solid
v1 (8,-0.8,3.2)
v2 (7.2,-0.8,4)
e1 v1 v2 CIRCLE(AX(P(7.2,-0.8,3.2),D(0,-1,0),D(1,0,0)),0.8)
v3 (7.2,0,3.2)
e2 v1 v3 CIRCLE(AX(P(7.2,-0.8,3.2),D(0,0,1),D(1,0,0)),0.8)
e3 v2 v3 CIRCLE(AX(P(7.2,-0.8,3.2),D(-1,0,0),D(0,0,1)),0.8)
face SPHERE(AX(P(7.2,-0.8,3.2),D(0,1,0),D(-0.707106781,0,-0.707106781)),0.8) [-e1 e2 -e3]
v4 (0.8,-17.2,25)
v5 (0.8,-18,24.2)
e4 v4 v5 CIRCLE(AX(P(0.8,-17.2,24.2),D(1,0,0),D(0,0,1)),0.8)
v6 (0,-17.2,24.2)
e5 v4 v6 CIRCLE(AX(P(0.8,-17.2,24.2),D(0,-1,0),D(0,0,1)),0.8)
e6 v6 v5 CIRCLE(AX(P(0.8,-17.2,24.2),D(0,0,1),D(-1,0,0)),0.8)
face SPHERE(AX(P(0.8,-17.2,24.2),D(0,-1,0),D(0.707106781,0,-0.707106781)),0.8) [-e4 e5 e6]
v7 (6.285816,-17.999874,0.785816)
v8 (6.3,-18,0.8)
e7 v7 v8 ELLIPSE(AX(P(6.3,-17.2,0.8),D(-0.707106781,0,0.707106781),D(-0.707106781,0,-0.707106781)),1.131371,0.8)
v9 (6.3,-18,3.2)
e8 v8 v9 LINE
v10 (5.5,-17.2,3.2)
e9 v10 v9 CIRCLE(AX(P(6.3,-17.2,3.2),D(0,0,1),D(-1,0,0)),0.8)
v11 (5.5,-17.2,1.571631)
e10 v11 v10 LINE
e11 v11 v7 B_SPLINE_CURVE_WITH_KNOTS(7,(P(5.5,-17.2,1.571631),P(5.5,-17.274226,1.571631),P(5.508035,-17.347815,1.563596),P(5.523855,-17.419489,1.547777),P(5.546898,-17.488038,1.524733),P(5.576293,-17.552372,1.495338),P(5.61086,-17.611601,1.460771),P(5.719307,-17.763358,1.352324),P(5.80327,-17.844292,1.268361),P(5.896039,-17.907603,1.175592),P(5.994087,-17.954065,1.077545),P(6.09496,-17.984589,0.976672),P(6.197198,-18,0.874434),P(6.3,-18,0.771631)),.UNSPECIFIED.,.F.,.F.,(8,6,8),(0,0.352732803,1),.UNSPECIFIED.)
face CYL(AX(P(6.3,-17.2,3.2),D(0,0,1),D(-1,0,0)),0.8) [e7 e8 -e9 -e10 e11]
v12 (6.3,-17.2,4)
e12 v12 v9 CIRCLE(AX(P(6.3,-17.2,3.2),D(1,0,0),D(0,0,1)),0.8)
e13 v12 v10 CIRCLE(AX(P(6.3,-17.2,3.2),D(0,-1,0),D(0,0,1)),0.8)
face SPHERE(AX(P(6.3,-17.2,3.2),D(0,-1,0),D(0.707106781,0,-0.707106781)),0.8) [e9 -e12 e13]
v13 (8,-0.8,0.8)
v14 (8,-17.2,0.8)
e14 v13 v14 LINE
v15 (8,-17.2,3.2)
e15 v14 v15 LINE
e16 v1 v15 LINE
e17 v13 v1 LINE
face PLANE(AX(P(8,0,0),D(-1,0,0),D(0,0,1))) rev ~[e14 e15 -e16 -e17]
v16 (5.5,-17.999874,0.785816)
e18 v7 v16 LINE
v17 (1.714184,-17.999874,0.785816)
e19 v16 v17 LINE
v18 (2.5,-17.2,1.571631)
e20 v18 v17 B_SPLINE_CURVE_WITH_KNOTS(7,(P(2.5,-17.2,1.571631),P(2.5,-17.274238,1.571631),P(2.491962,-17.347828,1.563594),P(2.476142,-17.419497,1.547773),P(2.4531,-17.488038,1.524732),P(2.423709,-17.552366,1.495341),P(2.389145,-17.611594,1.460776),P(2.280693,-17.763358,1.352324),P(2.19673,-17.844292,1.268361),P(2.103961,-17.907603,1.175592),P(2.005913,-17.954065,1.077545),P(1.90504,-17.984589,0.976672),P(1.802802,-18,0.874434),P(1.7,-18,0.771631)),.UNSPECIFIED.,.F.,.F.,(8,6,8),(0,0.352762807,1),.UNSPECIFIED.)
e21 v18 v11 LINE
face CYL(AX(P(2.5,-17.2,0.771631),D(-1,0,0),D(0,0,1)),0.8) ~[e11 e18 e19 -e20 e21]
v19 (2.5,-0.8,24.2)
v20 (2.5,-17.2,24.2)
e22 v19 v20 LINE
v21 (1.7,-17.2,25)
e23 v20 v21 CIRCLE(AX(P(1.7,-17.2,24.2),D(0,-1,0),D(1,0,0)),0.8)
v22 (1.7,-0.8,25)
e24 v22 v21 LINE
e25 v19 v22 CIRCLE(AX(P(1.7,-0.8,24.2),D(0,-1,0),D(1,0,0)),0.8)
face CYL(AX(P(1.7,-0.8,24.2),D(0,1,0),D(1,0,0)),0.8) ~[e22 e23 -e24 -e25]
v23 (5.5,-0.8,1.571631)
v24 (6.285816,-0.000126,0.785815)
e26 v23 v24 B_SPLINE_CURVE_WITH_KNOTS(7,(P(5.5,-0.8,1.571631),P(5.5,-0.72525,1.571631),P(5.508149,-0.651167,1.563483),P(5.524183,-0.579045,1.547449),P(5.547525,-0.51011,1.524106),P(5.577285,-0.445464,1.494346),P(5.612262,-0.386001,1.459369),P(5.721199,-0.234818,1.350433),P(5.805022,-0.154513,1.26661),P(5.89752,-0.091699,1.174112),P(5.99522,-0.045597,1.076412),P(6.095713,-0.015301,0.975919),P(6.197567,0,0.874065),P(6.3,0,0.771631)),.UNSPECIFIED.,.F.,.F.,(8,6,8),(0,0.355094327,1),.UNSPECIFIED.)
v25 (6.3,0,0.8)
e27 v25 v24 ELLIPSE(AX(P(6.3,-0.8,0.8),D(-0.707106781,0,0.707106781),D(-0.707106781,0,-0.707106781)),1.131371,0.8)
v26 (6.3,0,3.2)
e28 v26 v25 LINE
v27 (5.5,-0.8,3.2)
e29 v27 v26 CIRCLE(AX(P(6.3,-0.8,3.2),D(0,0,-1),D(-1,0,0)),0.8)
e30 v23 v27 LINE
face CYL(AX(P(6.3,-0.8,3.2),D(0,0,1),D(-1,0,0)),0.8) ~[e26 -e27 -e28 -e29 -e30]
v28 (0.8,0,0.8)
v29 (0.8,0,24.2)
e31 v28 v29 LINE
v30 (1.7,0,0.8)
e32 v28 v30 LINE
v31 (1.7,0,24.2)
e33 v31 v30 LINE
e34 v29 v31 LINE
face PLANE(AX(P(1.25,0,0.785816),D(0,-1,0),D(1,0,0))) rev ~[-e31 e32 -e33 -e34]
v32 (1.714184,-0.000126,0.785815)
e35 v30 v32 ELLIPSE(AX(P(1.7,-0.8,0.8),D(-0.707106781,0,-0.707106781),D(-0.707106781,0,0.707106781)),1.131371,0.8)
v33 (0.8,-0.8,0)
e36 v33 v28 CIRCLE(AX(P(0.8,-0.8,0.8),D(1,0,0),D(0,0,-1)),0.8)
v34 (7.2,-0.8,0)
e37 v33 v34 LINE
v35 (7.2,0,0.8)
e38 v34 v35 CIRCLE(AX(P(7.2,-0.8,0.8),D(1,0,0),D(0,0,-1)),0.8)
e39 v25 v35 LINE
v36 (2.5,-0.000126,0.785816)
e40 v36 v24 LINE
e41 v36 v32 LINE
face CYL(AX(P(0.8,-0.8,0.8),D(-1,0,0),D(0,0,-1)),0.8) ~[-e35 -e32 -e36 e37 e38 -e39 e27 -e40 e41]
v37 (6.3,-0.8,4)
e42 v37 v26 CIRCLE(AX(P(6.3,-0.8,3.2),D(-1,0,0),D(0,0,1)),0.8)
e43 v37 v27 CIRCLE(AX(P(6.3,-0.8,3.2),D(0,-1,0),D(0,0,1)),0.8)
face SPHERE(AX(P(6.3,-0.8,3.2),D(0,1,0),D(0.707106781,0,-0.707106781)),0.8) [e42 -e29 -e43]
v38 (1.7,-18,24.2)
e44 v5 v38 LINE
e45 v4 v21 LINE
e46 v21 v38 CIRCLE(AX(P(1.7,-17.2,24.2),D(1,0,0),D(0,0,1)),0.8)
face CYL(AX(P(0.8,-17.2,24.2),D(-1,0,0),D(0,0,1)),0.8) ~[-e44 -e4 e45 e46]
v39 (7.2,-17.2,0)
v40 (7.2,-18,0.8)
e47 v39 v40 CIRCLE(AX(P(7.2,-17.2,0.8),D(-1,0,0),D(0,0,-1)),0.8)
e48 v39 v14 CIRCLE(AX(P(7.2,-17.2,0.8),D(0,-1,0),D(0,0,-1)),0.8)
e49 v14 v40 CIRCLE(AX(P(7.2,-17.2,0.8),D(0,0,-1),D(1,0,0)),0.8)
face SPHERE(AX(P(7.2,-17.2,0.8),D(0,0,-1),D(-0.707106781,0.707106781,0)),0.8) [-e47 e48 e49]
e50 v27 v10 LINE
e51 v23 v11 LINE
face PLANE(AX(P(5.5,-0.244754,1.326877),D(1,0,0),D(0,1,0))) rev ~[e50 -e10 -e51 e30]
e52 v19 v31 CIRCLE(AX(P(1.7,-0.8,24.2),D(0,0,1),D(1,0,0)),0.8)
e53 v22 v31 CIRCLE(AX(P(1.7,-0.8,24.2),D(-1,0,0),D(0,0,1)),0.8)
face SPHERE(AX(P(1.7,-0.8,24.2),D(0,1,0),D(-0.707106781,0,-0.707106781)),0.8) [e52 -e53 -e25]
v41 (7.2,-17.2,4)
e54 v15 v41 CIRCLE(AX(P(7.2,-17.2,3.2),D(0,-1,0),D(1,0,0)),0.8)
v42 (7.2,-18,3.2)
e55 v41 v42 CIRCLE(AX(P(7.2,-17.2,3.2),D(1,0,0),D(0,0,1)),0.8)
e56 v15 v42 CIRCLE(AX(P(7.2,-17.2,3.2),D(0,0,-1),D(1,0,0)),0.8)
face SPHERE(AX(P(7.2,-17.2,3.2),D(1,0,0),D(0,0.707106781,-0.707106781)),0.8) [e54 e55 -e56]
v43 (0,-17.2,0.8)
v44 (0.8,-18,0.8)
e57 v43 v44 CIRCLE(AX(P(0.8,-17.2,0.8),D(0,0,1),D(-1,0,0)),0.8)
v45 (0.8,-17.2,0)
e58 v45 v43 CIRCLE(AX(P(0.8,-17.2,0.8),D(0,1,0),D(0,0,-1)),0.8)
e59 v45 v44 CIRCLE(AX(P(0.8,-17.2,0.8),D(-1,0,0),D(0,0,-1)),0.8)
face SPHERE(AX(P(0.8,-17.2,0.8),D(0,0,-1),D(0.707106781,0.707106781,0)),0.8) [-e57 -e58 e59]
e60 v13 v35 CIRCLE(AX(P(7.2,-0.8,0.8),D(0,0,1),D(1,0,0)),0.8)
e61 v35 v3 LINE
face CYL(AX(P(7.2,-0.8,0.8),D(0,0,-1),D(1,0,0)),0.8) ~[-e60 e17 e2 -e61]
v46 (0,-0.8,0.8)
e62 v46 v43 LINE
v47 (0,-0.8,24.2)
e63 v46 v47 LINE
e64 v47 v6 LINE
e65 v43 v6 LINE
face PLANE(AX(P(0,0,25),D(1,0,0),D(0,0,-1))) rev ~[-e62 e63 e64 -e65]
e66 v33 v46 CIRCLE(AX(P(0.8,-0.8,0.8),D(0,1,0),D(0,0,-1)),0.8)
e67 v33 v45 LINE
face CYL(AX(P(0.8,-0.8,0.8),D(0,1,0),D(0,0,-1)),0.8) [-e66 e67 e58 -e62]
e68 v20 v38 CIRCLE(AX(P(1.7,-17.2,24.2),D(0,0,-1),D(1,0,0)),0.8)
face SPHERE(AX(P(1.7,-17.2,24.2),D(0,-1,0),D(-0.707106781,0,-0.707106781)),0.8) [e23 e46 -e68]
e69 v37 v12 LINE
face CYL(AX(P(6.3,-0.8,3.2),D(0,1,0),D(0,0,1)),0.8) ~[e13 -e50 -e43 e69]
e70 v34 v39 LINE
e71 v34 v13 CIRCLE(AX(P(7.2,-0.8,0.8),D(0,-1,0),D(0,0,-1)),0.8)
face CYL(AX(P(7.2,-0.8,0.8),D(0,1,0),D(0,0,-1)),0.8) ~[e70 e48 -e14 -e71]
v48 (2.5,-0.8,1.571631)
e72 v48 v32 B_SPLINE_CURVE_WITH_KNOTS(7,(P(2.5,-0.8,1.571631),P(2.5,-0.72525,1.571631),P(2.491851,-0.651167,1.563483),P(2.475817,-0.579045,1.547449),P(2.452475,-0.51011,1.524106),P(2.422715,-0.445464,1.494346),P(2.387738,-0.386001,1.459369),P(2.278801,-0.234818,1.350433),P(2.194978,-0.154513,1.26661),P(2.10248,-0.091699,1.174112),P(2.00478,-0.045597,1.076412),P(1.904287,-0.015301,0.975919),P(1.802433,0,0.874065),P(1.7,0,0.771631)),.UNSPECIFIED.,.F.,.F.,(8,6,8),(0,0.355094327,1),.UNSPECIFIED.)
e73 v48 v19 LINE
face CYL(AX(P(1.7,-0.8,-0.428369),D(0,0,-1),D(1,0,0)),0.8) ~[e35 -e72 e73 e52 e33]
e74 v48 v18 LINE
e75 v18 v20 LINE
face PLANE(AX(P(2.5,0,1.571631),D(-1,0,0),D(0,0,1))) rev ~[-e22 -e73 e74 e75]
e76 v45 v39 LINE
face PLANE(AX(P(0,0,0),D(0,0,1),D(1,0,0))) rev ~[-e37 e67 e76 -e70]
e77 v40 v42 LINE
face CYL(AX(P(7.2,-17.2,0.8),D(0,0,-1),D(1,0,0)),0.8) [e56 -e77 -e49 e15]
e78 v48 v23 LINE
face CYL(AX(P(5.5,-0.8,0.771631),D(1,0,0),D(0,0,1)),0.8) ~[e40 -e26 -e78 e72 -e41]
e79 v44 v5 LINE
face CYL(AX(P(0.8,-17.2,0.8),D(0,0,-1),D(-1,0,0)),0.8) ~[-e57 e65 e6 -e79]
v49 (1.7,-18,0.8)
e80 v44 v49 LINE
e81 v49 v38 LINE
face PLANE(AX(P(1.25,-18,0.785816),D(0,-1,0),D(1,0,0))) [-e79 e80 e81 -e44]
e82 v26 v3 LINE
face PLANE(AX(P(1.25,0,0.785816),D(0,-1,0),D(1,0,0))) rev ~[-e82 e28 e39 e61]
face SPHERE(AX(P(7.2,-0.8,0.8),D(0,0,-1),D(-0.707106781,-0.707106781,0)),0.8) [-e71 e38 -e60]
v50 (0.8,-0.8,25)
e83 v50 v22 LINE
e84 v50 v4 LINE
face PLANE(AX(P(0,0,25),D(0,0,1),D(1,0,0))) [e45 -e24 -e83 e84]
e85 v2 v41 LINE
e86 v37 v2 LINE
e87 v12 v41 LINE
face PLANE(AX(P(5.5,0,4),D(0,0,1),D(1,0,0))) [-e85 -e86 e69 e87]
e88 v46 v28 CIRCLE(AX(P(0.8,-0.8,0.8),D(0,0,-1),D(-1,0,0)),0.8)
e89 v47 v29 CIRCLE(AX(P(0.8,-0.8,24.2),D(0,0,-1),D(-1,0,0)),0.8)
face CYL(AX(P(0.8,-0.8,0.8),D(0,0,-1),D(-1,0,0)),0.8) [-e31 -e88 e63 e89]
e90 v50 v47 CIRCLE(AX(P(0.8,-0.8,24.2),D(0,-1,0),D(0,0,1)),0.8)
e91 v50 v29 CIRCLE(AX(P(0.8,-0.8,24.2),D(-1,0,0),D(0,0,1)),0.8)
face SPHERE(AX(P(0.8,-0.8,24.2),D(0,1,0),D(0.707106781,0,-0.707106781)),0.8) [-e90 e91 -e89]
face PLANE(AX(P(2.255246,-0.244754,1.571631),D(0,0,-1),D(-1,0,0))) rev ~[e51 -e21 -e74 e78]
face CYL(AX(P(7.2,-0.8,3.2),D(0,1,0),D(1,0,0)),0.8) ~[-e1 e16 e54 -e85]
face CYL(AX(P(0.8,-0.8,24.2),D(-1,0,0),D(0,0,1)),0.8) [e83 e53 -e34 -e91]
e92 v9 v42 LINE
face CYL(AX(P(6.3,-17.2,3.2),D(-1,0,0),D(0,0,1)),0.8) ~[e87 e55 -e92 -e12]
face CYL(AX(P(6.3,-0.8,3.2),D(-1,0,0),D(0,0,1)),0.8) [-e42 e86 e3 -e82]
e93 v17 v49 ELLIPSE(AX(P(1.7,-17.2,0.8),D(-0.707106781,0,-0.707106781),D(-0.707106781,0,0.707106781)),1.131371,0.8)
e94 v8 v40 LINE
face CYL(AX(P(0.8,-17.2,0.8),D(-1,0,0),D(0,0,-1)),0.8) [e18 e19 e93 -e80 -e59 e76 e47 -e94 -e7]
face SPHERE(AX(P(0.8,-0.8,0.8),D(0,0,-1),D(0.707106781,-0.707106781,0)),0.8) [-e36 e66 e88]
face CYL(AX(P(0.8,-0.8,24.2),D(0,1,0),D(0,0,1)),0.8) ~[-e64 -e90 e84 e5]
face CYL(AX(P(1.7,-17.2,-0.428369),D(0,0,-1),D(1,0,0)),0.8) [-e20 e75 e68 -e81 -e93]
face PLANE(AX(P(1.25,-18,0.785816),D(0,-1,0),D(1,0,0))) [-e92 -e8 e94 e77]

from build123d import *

# Parameters (mm, degrees)
F0_W          = 2.5
F0_H          = 1.5716314532
F0_W_2        = 3
F0_H_2        = 23.4283685468
F0_H_3        = 2.4283685468
F1_DEPTH      = 18
F2_T1_DEPTH   = 16.4
F2_T3_DEPTH   = 22.6283685468
F2_T5_DEPTH   = 3
F2_T7_DEPTH   = 1.6283685468
F2_T9_DEPTH   = 0.9
F2_T11_DEPTH  = 2.4
F2_T13_DEPTH  = 6.4
F2_T15_DEPTH  = 23.4
F2_T17_DEPTH  = 0.9
F2_S21_W      = 0.8
F2_S21_H      = 0.8
F2_T22_DEPTH  = 0.8
F2_S27_W      = 0.8
F2_S27_H      = 0.8
F2_T28_DEPTH  = 0.8
F2_S33_W      = 0.8
F2_S33_H      = 0.8
F2_T34_DEPTH  = 0.8
F2_S39_W      = 0.8
F2_S39_H      = 0.8
F2_T40_DEPTH  = 0.8
F2_S45_W      = 0.8
F2_S45_H      = 0.8
F2_T46_DEPTH  = 0.8
F2_S51_W      = 0.8
F2_S51_H      = 0.8
F2_T52_DEPTH  = 0.8
F2_S57_W      = 0.8
F2_S57_H      = 0.8
F2_T58_DEPTH  = 0.8
F2_S63_W      = 0.8
F2_S63_H      = 0.8
F2_T64_DEPTH  = 0.8
F2_S69_W      = 0.8
F2_S69_H      = 0.8
F2_T70_DEPTH  = 0.8
F2_S75_W      = 0.8
F2_S75_H      = 0.8
F2_T76_DEPTH  = 0.8
F2_S81_W      = 0.8
F2_S81_H      = 0.8
F2_T82_DEPTH  = 0.8
F2_S87_W      = 0.8
F2_S87_H      = 0.8
F2_T88_DEPTH  = 0.8
F2_T95_DEPTH  = 5
F2_T99_DEPTH  = 24.6283685468
F2_T106_DEPTH = 3.6283685468
F2_T110_DEPTH = 5
F2_T117_DEPTH = 3.6283685468
F2_T121_DEPTH = 5
F2_T128_DEPTH = 5
F2_T132_DEPTH = 24.6283685468


# Not quite as in the source:
# - a fillet or chamfer that OpenCascade refuses, or shapes differently, is made with other operations: its cross-section is extruded or revolved along the edge and cut away or added


with BuildPart() as f1:
    # F0 (on Front) → F1 (new body)
    with BuildSketch(Plane.XZ):
        with Locations((1.25, 0.7858157266)):
            Rectangle(F0_W, F0_H)
        with Locations((4, 0.7858157266)):
            Rectangle(F0_W_2, F0_H)
        with Locations((1.25, 13.2858157266)):
            Rectangle(F0_W, F0_H_2)
        with Locations((6.75, 0.7858157266)):
            Rectangle(F0_W, F0_H)
        with Locations((6.75, 2.7858157266)):
            Rectangle(F0_W, F0_H_3)
    extrude(amount=F1_DEPTH)

    # F2: fillet of radius 0.8 on 22 edges, made by hand

    # F2_s2 → F2_t1 (cut)
    with BuildSketch(Plane.XZ.offset(0.8)):
        with BuildLine():
            ThreePointArc((8, 3.2), (7.7656854249, 3.7656854249), (7.2, 4))
            Line((7.2, 4), (8, 4))
            Line((8, 4), (8, 3.2))
        make_face()
        with BuildLine():
            ThreePointArc((7.2, 0), (7.7656854249, 0.2343145751), (8, 0.8))
            Line((8, 0.8), (8, 0))
            Line((8, 0), (7.2, 0))
        make_face()
        with BuildLine():
            ThreePointArc((6.3, 4), (5.7343145751, 3.7656854249), (5.5, 3.2))
            Line((5.5, 3.2), (5.5, 4))
            Line((5.5, 4), (6.3, 4))
        make_face()
        with BuildLine():
            ThreePointArc((2.5, 24.2), (2.2656854249, 24.7656854249), (1.7, 25))
            Line((1.7, 25), (2.5, 25))
            Line((2.5, 25), (2.5, 24.2))
        make_face()
        with BuildLine():
            ThreePointArc((0.8, 25), (0.2343145751, 24.7656854249), (0, 24.2))
            Line((0, 24.2), (0, 25))
            Line((0, 25), (0.8, 25))
        make_face()
        with BuildLine():
            ThreePointArc((0.8, 0), (0.2343145751, 0.2343145751), (0, 0.8))
            Line((0, 0.8), (0, 0))
            Line((0, 0), (0.8, 0))
        make_face()
    extrude(amount=F2_T1_DEPTH, mode=Mode.SUBTRACT)

    # F2_s4 → F2_t3 (cut)
    with BuildSketch(Plane.XY.offset(1.5716314532)):
        with BuildLine():
            ThreePointArc((2.5, -17.2), (2.2656854249, -17.7656854249), (1.7, -18))
            Line((1.7, -18), (2.5, -18))
            Line((2.5, -18), (2.5, -17.2))
        make_face()
        with BuildLine():
            ThreePointArc((2.5, -0.8), (2.2656854249, -0.2343145751), (1.7, 0))
            Line((1.7, 0), (2.5, 0))
            Line((2.5, 0), (2.5, -0.8))
        make_face()
    extrude(amount=F2_T3_DEPTH, mode=Mode.SUBTRACT)

    # F2_s6 → F2_t5 (cut)
    with BuildSketch(Plane.YZ.offset(2.5)):
        with BuildLine():
            ThreePointArc((-17.2, 1.5716314532), (-17.7656854249, 1.3373168782), (-18, 0.7716314532))
            Line((-18, 0.7716314532), (-18, 1.5716314532))
            Line((-18, 1.5716314532), (-17.2, 1.5716314532))
        make_face()
        with BuildLine():
            ThreePointArc((-0.8, 1.5716314532), (-0.2343145751, 1.3373168782), (0, 0.7716314532))
            Line((0, 0.7716314532), (0, 1.5716314532))
            Line((0, 1.5716314532), (-0.8, 1.5716314532))
        make_face()
    extrude(amount=F2_T5_DEPTH, mode=Mode.SUBTRACT)

    # F2_s8 → F2_t7 (cut)
    with BuildSketch(Plane.XY.offset(1.5716314532)):
        with BuildLine():
            ThreePointArc((5.5, -17.2), (5.7343145751, -17.7656854249), (6.3, -18))
            Line((6.3, -18), (5.5, -18))
            Line((5.5, -18), (5.5, -17.2))
        make_face()
        with BuildLine():
            ThreePointArc((5.5, -0.8), (5.7343145751, -0.2343145751), (6.3, 0))
            Line((6.3, 0), (5.5, 0))
            Line((5.5, 0), (5.5, -0.8))
        make_face()
    extrude(amount=F2_T7_DEPTH, mode=Mode.SUBTRACT)

    # F2_s10 → F2_t9 (cut)
    with BuildSketch(Plane.YZ.offset(6.3)):
        with BuildLine():
            ThreePointArc((-17.2, 4), (-17.7656854249, 3.7656854249), (-18, 3.2))
            Line((-18, 3.2), (-18, 4))
            Line((-18, 4), (-17.2, 4))
        make_face()
        with BuildLine():
            ThreePointArc((-0.8, 4), (-0.2343145751, 3.7656854249), (0, 3.2))
            Line((0, 3.2), (0, 4))
            Line((0, 4), (-0.8, 4))
        make_face()
    extrude(amount=F2_T9_DEPTH, mode=Mode.SUBTRACT)

    # F2_s12 → F2_t11 (cut)
    with BuildSketch(Plane.XY.offset(0.8)):
        with BuildLine():
            ThreePointArc((8, -17.2), (7.7656854249, -17.7656854249), (7.2, -18))
            Line((7.2, -18), (8, -18))
            Line((8, -18), (8, -17.2))
        make_face()
        with BuildLine():
            ThreePointArc((8, -0.8), (7.7656854249, -0.2343145751), (7.2, 0))
            Line((7.2, 0), (8, 0))
            Line((8, 0), (8, -0.8))
        make_face()
    extrude(amount=F2_T11_DEPTH, mode=Mode.SUBTRACT)

    # F2_s14 → F2_t13 (cut)
    with BuildSketch(Plane.YZ.offset(0.8)):
        with BuildLine():
            ThreePointArc((-17.2, 0), (-17.7656854249, 0.2343145751), (-18, 0.8))
            Line((-18, 0.8), (-18, 0))
            Line((-18, 0), (-17.2, 0))
        make_face()
        with BuildLine():
            ThreePointArc((-0.8, 0), (-0.2343145751, 0.2343145751), (0, 0.8))
            Line((0, 0.8), (0, 0))
            Line((0, 0), (-0.8, 0))
        make_face()
    extrude(amount=F2_T13_DEPTH, mode=Mode.SUBTRACT)

    # F2_s16 → F2_t15 (cut)
    with BuildSketch(Plane.XY.offset(0.8)):
        with BuildLine():
            ThreePointArc((0, -17.2), (0.2343145751, -17.7656854249), (0.8, -18))
            Line((0.8, -18), (0, -18))
            Line((0, -18), (0, -17.2))
        make_face()
        with BuildLine():
            ThreePointArc((0, -0.8), (0.2343145751, -0.2343145751), (0.8, 0))
            Line((0.8, 0), (0, 0))
            Line((0, 0), (0, -0.8))
        make_face()
    extrude(amount=F2_T15_DEPTH, mode=Mode.SUBTRACT)

    # F2_s18 → F2_t17 (cut)
    with BuildSketch(Plane.YZ.offset(0.8)):
        with BuildLine():
            ThreePointArc((-0.8, 25), (-0.2343145751, 24.7656854249), (0, 24.2))
            Line((0, 24.2), (0, 25))
            Line((0, 25), (-0.8, 25))
        make_face()
        with BuildLine():
            ThreePointArc((-17.2, 25), (-17.7656854249, 24.7656854249), (-18, 24.2))
            Line((-18, 24.2), (-18, 25))
            Line((-18, 25), (-17.2, 25))
        make_face()
    extrude(amount=F2_T17_DEPTH, mode=Mode.SUBTRACT)


with BuildPart() as f2_tool20:
    # F2_s21 → F2_t22 (new body)
    with BuildSketch(Plane.XZ.offset(0.8)):
        with Locations((7.6, 3.6)):
            Rectangle(F2_S21_W, F2_S21_H)
    extrude(amount=-F2_T22_DEPTH)

    # F2_s23 → F2_t24 (revolve, cut)
    with BuildSketch(Plane(origin=(7.2, -0.8, 3.2), x_dir=(-0.7071067812, 0, -0.7071067812), z_dir=(0.7071067812, 0, -0.7071067812))):
        with BuildLine():
            ThreePointArc((0, -0.8), (0.8, 0), (0, 0.8))
            Line((0, 0.8), (0, -0.8))
        make_face()
    revolve(axis=Axis((7.2, -0.8, 3.2), (0, 1, 0)), mode=Mode.SUBTRACT)


with BuildPart() as f1_1:
    add(f1.part)

    # F2_t19: cut F2_tool20
    add(f2_tool20.part, mode=Mode.SUBTRACT)


with BuildPart() as f2_tool26:
    # F2_s27 → F2_t28 (new body)
    with BuildSketch(Plane.YZ.offset(7.2)):
        with Locations((-17.6, 3.6)):
            Rectangle(F2_S27_W, F2_S27_H)
    extrude(amount=F2_T28_DEPTH)

    # F2_s29 → F2_t30 (revolve, cut)
    with BuildSketch(Plane(origin=(7.2, -17.2, 3.2), x_dir=(0, 0.7071067812, -0.7071067812), z_dir=(0, -0.7071067812, -0.7071067812))):
        with BuildLine():
            ThreePointArc((0, -0.8), (0.8, 0), (0, 0.8))
            Line((0, 0.8), (0, -0.8))
        make_face()
    revolve(axis=Axis((7.2, -17.2, 3.2), (1, 0, 0)), mode=Mode.SUBTRACT)


with BuildPart() as f1_2:
    add(f1_1.part)

    # F2_t25: cut F2_tool26
    add(f2_tool26.part, mode=Mode.SUBTRACT)


with BuildPart() as f2_tool32:
    # F2_s33 → F2_t34 (new body)
    with BuildSketch(Plane.XZ.offset(17.2)):
        with Locations((2.1, 24.6)):
            Rectangle(F2_S33_W, F2_S33_H)
    extrude(amount=F2_T34_DEPTH)

    # F2_s35 → F2_t36 (revolve, cut)
    with BuildSketch(Plane(origin=(1.7, -17.2, 24.2), x_dir=(-0.7071067812, 0, -0.7071067812), z_dir=(-0.7071067812, 0, 0.7071067812))):
        with BuildLine():
            ThreePointArc((0, -0.8), (0.8, 0), (0, 0.8))
            Line((0, 0.8), (0, -0.8))
        make_face()
    revolve(axis=Axis((1.7, -17.2, 24.2), (0, -1, 0)), mode=Mode.SUBTRACT)


with BuildPart() as f1_3:
    add(f1_2.part)

    # F2_t31: cut F2_tool32
    add(f2_tool32.part, mode=Mode.SUBTRACT)


with BuildPart() as f2_tool38:
    # F2_s39 → F2_t40 (new body)
    with BuildSketch(Plane.XZ.offset(17.2)):
        with Locations((5.9, 3.6)):
            Rectangle(F2_S39_W, F2_S39_H)
    extrude(amount=F2_T40_DEPTH)

    # F2_s41 → F2_t42 (revolve, cut)
    with BuildSketch(Plane(origin=(6.3, -17.2, 3.2), x_dir=(0.7071067812, 0, -0.7071067812), z_dir=(-0.7071067812, 0, -0.7071067812))):
        with BuildLine():
            ThreePointArc((0, -0.8), (0.8, 0), (0, 0.8))
            Line((0, 0.8), (0, -0.8))
        make_face()
    revolve(axis=Axis((6.3, -17.2, 3.2), (0, -1, 0)), mode=Mode.SUBTRACT)


with BuildPart() as f1_4:
    add(f1_3.part)

    # F2_t37: cut F2_tool38
    add(f2_tool38.part, mode=Mode.SUBTRACT)


with BuildPart() as f2_tool44:
    # F2_s45 → F2_t46 (new body)
    with BuildSketch(Plane.XY.offset(0.8)):
        with Locations((7.6, -17.6)):
            Rectangle(F2_S45_W, F2_S45_H)
    extrude(amount=-F2_T46_DEPTH)

    # F2_s47 → F2_t48 (revolve, cut)
    with BuildSketch(Plane(origin=(7.2, -17.2, 0.8), x_dir=(-0.7071067812, 0.7071067812, 0), z_dir=(-0.7071067812, -0.7071067812, 0))):
        with BuildLine():
            ThreePointArc((0, -0.8), (0.8, 0), (0, 0.8))
            Line((0, 0.8), (0, -0.8))
        make_face()
    revolve(axis=Axis((7.2, -17.2, 0.8), (0, 0, -1)), mode=Mode.SUBTRACT)


with BuildPart() as f1_5:
    add(f1_4.part)

    # F2_t43: cut F2_tool44
    add(f2_tool44.part, mode=Mode.SUBTRACT)


with BuildPart() as f2_tool50:
    # F2_s51 → F2_t52 (new body)
    with BuildSketch(Plane.XY.offset(0.8)):
        with Locations((0.4, -17.6)):
            Rectangle(F2_S51_W, F2_S51_H)
    extrude(amount=-F2_T52_DEPTH)

    # F2_s53 → F2_t54 (revolve, cut)
    with BuildSketch(Plane(origin=(0.8, -17.2, 0.8), x_dir=(0.7071067812, 0.7071067812, 0), z_dir=(-0.7071067812, 0.7071067812, 0))):
        with BuildLine():
            ThreePointArc((0, -0.8), (0.8, 0), (0, 0.8))
            Line((0, 0.8), (0, -0.8))
        make_face()
    revolve(axis=Axis((0.8, -17.2, 0.8), (0, 0, -1)), mode=Mode.SUBTRACT)


with BuildPart() as f1_6:
    add(f1_5.part)

    # F2_t49: cut F2_tool50
    add(f2_tool50.part, mode=Mode.SUBTRACT)


with BuildPart() as f2_tool56:
    # F2_s57 → F2_t58 (new body)
    with BuildSketch(Plane.XZ.offset(17.2)):
        with Locations((0.4, 24.6)):
            Rectangle(F2_S57_W, F2_S57_H)
    extrude(amount=F2_T58_DEPTH)

    # F2_s59 → F2_t60 (revolve, cut)
    with BuildSketch(Plane(origin=(0.8, -17.2, 24.2), x_dir=(0.7071067812, 0, -0.7071067812), z_dir=(-0.7071067812, 0, -0.7071067812))):
        with BuildLine():
            ThreePointArc((0, -0.8), (0.8, 0), (0, 0.8))
            Line((0, 0.8), (0, -0.8))
        make_face()
    revolve(axis=Axis((0.8, -17.2, 24.2), (0, -1, 0)), mode=Mode.SUBTRACT)


with BuildPart() as f1_7:
    add(f1_6.part)

    # F2_t55: cut F2_tool56
    add(f2_tool56.part, mode=Mode.SUBTRACT)


with BuildPart() as f2_tool62:
    # F2_s63 → F2_t64 (new body)
    with BuildSketch(Plane.XY.offset(0.8)):
        with Locations((7.6, -0.4)):
            Rectangle(F2_S63_W, F2_S63_H)
    extrude(amount=-F2_T64_DEPTH)

    # F2_s65 → F2_t66 (revolve, cut)
    with BuildSketch(Plane(origin=(7.2, -0.8, 0.8), x_dir=(-0.7071067812, -0.7071067812, 0), z_dir=(0.7071067812, -0.7071067812, 0))):
        with BuildLine():
            ThreePointArc((0, -0.8), (0.8, 0), (0, 0.8))
            Line((0, 0.8), (0, -0.8))
        make_face()
    revolve(axis=Axis((7.2, -0.8, 0.8), (0, 0, -1)), mode=Mode.SUBTRACT)


with BuildPart() as f1_8:
    add(f1_7.part)

    # F2_t61: cut F2_tool62
    add(f2_tool62.part, mode=Mode.SUBTRACT)


with BuildPart() as f2_tool68:
    # F2_s69 → F2_t70 (new body)
    with BuildSketch(Plane.XZ.offset(0.8)):
        with Locations((5.9, 3.6)):
            Rectangle(F2_S69_W, F2_S69_H)
    extrude(amount=-F2_T70_DEPTH)

    # F2_s71 → F2_t72 (revolve, cut)
    with BuildSketch(Plane(origin=(6.3, -0.8, 3.2), x_dir=(0.7071067812, 0, -0.7071067812), z_dir=(0.7071067812, 0, 0.7071067812))):
        with BuildLine():
            ThreePointArc((0, -0.8), (0.8, 0), (0, 0.8))
            Line((0, 0.8), (0, -0.8))
        make_face()
    revolve(axis=Axis((6.3, -0.8, 3.2), (0, 1, 0)), mode=Mode.SUBTRACT)


with BuildPart() as f1_9:
    add(f1_8.part)

    # F2_t67: cut F2_tool68
    add(f2_tool68.part, mode=Mode.SUBTRACT)


with BuildPart() as f2_tool74:
    # F2_s75 → F2_t76 (new body)
    with BuildSketch(Plane.XY.offset(0.8)):
        with Locations((0.4, -0.4)):
            Rectangle(F2_S75_W, F2_S75_H)
    extrude(amount=-F2_T76_DEPTH)

    # F2_s77 → F2_t78 (revolve, cut)
    with BuildSketch(Plane(origin=(0.8, -0.8, 0.8), x_dir=(0.7071067812, -0.7071067812, 0), z_dir=(0.7071067812, 0.7071067812, 0))):
        with BuildLine():
            ThreePointArc((0, -0.8), (0.8, 0), (0, 0.8))
            Line((0, 0.8), (0, -0.8))
        make_face()
    revolve(axis=Axis((0.8, -0.8, 0.8), (0, 0, -1)), mode=Mode.SUBTRACT)


with BuildPart() as f1_10:
    add(f1_9.part)

    # F2_t73: cut F2_tool74
    add(f2_tool74.part, mode=Mode.SUBTRACT)


with BuildPart() as f2_tool80:
    # F2_s81 → F2_t82 (new body)
    with BuildSketch(Plane.XZ.offset(0.8)):
        with Locations((2.1, 24.6)):
            Rectangle(F2_S81_W, F2_S81_H)
    extrude(amount=-F2_T82_DEPTH)

    # F2_s83 → F2_t84 (revolve, cut)
    with BuildSketch(Plane(origin=(1.7, -0.8, 24.2), x_dir=(-0.7071067812, 0, -0.7071067812), z_dir=(0.7071067812, 0, -0.7071067812))):
        with BuildLine():
            ThreePointArc((0, -0.8), (0.8, 0), (0, 0.8))
            Line((0, 0.8), (0, -0.8))
        make_face()
    revolve(axis=Axis((1.7, -0.8, 24.2), (0, 1, 0)), mode=Mode.SUBTRACT)


with BuildPart() as f1_11:
    add(f1_10.part)

    # F2_t79: cut F2_tool80
    add(f2_tool80.part, mode=Mode.SUBTRACT)


with BuildPart() as f2_tool86:
    # F2_s87 → F2_t88 (new body)
    with BuildSketch(Plane.XZ.offset(0.8)):
        with Locations((0.4, 24.6)):
            Rectangle(F2_S87_W, F2_S87_H)
    extrude(amount=-F2_T88_DEPTH)

    # F2_s89 → F2_t90 (revolve, cut)
    with BuildSketch(Plane(origin=(0.8, -0.8, 24.2), x_dir=(0.7071067812, 0, -0.7071067812), z_dir=(0.7071067812, 0, 0.7071067812))):
        with BuildLine():
            ThreePointArc((0, -0.8), (0.8, 0), (0, 0.8))
            Line((0, 0.8), (0, -0.8))
        make_face()
    revolve(axis=Axis((0.8, -0.8, 24.2), (0, 1, 0)), mode=Mode.SUBTRACT)


with BuildPart() as f1_12:
    add(f1_11.part)

    # F2_t85: cut F2_tool86
    add(f2_tool86.part, mode=Mode.SUBTRACT)


with BuildPart() as f2_tool93:
    # F2_s94 → F2_t95 (new body)
    with BuildSketch(Plane.YZ.offset(5.5)):
        with BuildLine():
            ThreePointArc((-17.2, 1.5716314532), (-17.7656854249, 1.3373168782), (-18, 0.7716314532))
            Line((-18, 0.7716314532), (-18, 1.5716314532))
            Line((-18, 1.5716314532), (-17.2, 1.5716314532))
        make_face()
    extrude(amount=-F2_T95_DEPTH)

    split(bisect_by=Plane.YZ.offset(2.5), keep=Keep.BOTTOM)


with BuildPart() as f2_tool97:
    # F2_s98 → F2_t99 (new body)
    with BuildSketch(Plane.XY.offset(-0.4283685468)):
        with BuildLine():
            ThreePointArc((2.5, -17.2), (2.2656854249, -17.7656854249), (1.7, -18))
            Line((1.7, -18), (2.5, -18))
            Line((2.5, -18), (2.5, -17.2))
        make_face()
    extrude(amount=F2_T99_DEPTH)

    split(bisect_by=Plane.XY.offset(1.5716314532), keep=Keep.BOTTOM)


with BuildPart() as f2_tool93_1:
    add(f2_tool93.part)

    # F2_t101: intersect F2_tool97
    add(f2_tool97.part, mode=Mode.INTERSECT)


with BuildPart() as f1_13:
    add(f1_12.part)

    # F2_t91: cut F2_tool93
    add(f2_tool93_1.part, mode=Mode.SUBTRACT)


with BuildPart() as f2_tool104:
    # F2_s105 → F2_t106 (new body)
    with BuildSketch(Plane.XY.offset(3.2)):
        with BuildLine():
            ThreePointArc((5.5, -17.2), (5.7343145751, -17.7656854249), (6.3, -18))
            Line((6.3, -18), (5.5, -18))
            Line((5.5, -18), (5.5, -17.2))
        make_face()
    extrude(amount=-F2_T106_DEPTH)

    split(bisect_by=Plane.XY.offset(1.5716314532), keep=Keep.BOTTOM)


with BuildPart() as f2_tool108:
    # F2_s109 → F2_t110 (new body)
    with BuildSketch(Plane.YZ.offset(7.5)):
        with BuildLine():
            ThreePointArc((-17.2, 1.5716314532), (-17.7656854249, 1.3373168782), (-18, 0.7716314532))
            Line((-18, 0.7716314532), (-18, 1.5716314532))
            Line((-18, 1.5716314532), (-17.2, 1.5716314532))
        make_face()
    extrude(amount=-F2_T110_DEPTH)

    split(bisect_by=Plane.YZ.offset(5.5), keep=Keep.TOP)


with BuildPart() as f2_tool104_1:
    add(f2_tool104.part)

    # F2_t112: intersect F2_tool108
    add(f2_tool108.part, mode=Mode.INTERSECT)


with BuildPart() as f1_14:
    add(f1_13.part)

    # F2_t102: cut F2_tool104
    add(f2_tool104_1.part, mode=Mode.SUBTRACT)


with BuildPart() as f2_tool115:
    # F2_s116 → F2_t117 (new body)
    with BuildSketch(Plane.XY.offset(3.2)):
        with BuildLine():
            ThreePointArc((5.5, -0.8), (5.7343145751, -0.2343145751), (6.3, 0))
            Line((6.3, 0), (5.5, 0))
            Line((5.5, 0), (5.5, -0.8))
        make_face()
    extrude(amount=-F2_T117_DEPTH)

    split(bisect_by=Plane.XY.offset(1.5716314532), keep=Keep.BOTTOM)


with BuildPart() as f2_tool119:
    # F2_s120 → F2_t121 (new body)
    with BuildSketch(Plane.YZ.offset(7.5)):
        with BuildLine():
            ThreePointArc((-0.8, 1.5716314532), (-0.2343145751, 1.3373168782), (0, 0.7716314532))
            Line((0, 0.7716314532), (0, 1.5716314532))
            Line((0, 1.5716314532), (-0.8, 1.5716314532))
        make_face()
    extrude(amount=-F2_T121_DEPTH)

    split(bisect_by=Plane.YZ.offset(5.5), keep=Keep.TOP)


with BuildPart() as f2_tool115_1:
    add(f2_tool115.part)

    # F2_t123: intersect F2_tool119
    add(f2_tool119.part, mode=Mode.INTERSECT)


with BuildPart() as f1_15:
    add(f1_14.part)

    # F2_t113: cut F2_tool115
    add(f2_tool115_1.part, mode=Mode.SUBTRACT)


with BuildPart() as f2_tool126:
    # F2_s127 → F2_t128 (new body)
    with BuildSketch(Plane.YZ.offset(5.5)):
        with BuildLine():
            ThreePointArc((-0.8, 1.5716314532), (-0.2343145751, 1.3373168782), (0, 0.7716314532))
            Line((0, 0.7716314532), (0, 1.5716314532))
            Line((0, 1.5716314532), (-0.8, 1.5716314532))
        make_face()
    extrude(amount=-F2_T128_DEPTH)

    split(bisect_by=Plane.YZ.offset(2.5), keep=Keep.BOTTOM)


with BuildPart() as f2_tool130:
    # F2_s131 → F2_t132 (new body)
    with BuildSketch(Plane.XY.offset(-0.4283685468)):
        with BuildLine():
            ThreePointArc((2.5, -0.8), (2.2656854249, -0.2343145751), (1.7, 0))
            Line((1.7, 0), (2.5, 0))
            Line((2.5, 0), (2.5, -0.8))
        make_face()
    extrude(amount=F2_T132_DEPTH)

    split(bisect_by=Plane.XY.offset(1.5716314532), keep=Keep.BOTTOM)


with BuildPart() as f2_tool126_1:
    add(f2_tool126.part)

    # F2_t134: intersect F2_tool130
    add(f2_tool130.part, mode=Mode.INTERSECT)


with BuildPart() as f1_16:
    add(f1_15.part)

    # F2_t124: cut F2_tool126
    add(f2_tool126_1.part, mode=Mode.SUBTRACT)


solid = f1_16.part
